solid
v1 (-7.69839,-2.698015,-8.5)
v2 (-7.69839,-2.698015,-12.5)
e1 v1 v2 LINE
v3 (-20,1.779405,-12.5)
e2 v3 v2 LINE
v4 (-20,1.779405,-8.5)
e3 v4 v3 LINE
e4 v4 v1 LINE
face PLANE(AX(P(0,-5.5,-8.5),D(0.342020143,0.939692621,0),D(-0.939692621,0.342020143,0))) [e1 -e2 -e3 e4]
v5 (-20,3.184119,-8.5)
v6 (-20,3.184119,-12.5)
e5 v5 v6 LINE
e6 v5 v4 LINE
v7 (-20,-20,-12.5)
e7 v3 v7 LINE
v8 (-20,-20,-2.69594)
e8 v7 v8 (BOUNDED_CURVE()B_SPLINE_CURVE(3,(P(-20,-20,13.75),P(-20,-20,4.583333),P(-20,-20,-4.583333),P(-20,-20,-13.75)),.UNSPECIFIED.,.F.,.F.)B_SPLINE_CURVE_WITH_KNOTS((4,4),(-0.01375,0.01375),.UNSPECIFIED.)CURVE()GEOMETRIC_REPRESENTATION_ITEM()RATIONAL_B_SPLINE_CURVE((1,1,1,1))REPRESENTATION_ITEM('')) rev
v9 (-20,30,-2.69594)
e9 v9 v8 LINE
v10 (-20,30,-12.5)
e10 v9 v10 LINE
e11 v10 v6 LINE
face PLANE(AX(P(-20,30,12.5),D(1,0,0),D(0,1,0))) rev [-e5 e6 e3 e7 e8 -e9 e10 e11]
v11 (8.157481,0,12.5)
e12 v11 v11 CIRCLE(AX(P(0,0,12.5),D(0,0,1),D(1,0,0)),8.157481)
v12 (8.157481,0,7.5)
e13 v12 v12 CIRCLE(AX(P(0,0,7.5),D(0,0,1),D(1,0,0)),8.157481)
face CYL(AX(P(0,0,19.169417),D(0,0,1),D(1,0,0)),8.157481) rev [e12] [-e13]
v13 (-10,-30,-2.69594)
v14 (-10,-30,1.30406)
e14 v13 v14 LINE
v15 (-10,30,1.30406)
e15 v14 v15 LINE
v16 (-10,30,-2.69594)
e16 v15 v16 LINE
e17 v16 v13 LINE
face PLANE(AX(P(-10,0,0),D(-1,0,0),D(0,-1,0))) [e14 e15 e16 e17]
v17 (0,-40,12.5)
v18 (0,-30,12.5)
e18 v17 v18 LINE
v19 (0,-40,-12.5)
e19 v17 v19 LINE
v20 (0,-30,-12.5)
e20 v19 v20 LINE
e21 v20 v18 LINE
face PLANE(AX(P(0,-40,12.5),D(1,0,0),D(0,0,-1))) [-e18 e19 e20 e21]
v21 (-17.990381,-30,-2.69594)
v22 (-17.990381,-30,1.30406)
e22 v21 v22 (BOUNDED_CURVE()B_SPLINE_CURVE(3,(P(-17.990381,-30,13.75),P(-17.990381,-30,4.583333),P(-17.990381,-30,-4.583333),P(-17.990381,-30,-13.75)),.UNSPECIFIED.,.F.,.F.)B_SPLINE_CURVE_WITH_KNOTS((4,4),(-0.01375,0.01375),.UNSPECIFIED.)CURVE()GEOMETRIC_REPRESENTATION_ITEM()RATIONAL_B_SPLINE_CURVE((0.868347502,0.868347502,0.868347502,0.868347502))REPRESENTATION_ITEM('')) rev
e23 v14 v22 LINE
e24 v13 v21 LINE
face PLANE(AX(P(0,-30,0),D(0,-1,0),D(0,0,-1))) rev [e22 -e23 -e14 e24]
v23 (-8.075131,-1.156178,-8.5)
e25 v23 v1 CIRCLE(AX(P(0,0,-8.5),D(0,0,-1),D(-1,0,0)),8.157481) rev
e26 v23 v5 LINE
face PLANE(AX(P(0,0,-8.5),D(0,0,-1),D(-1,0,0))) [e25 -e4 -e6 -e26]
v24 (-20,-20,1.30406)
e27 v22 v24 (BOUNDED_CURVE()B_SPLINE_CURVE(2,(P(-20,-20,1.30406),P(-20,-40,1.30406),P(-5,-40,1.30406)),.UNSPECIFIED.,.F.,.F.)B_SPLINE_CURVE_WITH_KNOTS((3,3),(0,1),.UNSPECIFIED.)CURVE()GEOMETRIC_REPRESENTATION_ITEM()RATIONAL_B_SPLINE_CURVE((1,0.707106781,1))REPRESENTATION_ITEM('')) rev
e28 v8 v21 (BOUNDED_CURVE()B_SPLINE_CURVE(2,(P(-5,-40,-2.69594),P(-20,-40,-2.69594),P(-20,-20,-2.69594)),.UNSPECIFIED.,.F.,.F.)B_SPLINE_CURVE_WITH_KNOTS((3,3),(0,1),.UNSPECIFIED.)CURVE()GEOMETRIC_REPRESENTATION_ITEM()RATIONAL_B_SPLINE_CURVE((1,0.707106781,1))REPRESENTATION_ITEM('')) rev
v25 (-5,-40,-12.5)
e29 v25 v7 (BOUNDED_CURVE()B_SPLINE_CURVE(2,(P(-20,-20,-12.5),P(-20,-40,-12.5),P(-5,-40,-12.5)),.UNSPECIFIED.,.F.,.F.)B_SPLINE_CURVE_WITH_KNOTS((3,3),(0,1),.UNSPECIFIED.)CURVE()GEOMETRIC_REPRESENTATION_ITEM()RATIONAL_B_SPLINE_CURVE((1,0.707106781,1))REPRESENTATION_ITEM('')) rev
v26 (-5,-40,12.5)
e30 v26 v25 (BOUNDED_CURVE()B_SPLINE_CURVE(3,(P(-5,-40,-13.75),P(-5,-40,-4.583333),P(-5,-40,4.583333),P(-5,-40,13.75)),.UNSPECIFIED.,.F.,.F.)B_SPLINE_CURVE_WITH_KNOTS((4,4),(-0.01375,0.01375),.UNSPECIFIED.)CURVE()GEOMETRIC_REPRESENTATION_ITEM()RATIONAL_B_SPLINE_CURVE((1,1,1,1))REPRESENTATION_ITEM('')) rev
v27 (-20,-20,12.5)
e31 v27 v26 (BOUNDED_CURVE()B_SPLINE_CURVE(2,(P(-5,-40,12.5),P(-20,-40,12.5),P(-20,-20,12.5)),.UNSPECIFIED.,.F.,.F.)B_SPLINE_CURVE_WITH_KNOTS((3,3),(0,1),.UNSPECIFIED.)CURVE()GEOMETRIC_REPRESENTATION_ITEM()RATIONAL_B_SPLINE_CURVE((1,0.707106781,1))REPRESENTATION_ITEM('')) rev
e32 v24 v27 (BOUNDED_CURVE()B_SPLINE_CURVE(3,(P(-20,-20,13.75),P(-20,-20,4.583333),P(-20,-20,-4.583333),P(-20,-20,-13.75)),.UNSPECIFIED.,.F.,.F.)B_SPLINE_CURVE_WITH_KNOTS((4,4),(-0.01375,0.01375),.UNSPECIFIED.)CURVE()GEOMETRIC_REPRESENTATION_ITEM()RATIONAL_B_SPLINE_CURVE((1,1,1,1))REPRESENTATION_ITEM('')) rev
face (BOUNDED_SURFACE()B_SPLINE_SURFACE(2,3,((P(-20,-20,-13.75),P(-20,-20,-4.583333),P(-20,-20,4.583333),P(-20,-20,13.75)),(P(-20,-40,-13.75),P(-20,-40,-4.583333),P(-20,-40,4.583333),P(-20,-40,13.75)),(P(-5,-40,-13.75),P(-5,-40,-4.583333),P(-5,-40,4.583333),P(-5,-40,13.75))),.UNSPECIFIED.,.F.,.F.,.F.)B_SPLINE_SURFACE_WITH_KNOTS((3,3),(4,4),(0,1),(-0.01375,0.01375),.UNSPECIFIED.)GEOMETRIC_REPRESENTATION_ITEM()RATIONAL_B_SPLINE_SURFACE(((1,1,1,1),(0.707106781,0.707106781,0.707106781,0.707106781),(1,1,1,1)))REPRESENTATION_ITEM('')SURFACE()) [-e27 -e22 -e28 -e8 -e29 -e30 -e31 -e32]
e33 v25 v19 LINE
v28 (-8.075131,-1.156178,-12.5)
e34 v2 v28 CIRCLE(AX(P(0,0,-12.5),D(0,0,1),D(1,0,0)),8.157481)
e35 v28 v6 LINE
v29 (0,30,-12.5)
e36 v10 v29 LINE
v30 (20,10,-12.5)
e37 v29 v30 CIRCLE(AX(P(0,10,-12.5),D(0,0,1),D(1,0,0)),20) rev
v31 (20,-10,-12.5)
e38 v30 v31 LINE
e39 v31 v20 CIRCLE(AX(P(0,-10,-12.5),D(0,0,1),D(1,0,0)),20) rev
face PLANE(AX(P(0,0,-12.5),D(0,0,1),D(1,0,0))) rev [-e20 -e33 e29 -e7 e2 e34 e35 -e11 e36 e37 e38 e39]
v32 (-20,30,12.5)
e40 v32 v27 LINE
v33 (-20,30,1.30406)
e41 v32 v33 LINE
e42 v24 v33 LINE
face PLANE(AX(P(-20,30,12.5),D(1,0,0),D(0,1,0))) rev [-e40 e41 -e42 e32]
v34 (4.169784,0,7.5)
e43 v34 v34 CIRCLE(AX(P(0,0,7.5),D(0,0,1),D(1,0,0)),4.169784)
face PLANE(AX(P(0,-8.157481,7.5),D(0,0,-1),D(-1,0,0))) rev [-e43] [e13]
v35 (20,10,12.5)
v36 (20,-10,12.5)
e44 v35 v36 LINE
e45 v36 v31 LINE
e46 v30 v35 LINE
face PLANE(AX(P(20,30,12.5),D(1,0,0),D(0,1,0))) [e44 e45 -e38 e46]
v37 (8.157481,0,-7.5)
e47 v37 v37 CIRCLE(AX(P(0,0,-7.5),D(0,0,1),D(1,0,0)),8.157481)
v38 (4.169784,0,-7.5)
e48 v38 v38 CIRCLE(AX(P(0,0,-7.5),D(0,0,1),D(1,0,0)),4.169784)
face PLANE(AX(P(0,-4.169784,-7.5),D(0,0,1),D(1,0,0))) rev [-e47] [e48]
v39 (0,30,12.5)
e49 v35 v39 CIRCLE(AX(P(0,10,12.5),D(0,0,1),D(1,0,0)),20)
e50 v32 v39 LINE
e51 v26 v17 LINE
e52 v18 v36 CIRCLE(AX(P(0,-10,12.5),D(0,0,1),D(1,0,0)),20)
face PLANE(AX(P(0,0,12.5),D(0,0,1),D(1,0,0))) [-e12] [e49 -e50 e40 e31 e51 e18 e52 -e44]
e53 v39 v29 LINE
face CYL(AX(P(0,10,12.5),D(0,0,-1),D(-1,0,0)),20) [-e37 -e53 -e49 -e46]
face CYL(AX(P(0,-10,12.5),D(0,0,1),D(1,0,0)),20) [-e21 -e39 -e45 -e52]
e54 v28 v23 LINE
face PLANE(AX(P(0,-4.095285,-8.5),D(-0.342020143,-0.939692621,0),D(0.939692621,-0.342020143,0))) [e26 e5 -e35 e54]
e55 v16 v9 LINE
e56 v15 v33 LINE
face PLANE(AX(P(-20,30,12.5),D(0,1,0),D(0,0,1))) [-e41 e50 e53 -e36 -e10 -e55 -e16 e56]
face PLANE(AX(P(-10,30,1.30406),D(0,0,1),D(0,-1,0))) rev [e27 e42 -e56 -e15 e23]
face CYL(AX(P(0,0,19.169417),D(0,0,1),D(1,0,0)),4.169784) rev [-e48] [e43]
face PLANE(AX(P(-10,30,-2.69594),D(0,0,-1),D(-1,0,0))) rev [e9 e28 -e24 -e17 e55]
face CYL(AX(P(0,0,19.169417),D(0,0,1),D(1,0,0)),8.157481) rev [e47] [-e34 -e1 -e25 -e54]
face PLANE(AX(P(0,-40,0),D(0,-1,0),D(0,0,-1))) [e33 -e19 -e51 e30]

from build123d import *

# Parameters (mm, degrees)
SKETCH1_W           = 40
SKETCH1_H           = 60
BOSS_EXTRUDE1_DEPTH = 12.5
SKETCH4_W           = 4
SKETCH4_H           = 60
CUT_EXTRUDE1_DEPTH  = 10
CUT_EXTRUDE2_DEPTH  = 4
FILLET1_R           = 20
SKETCH6_W           = 20
SKETCH6_H           = 25
BOSS_EXTRUDE2_DEPTH = 10
FILLET2_SIZE        = 15
FILLET2_SIZE_2      = 20


with BuildPart() as part:
    # Sketch1 → Boss-Extrude1 (new, symmetric)
    with BuildSketch(Plane.XY):
        Rectangle(SKETCH1_W, SKETCH1_H)
    extrude(amount=BOSS_EXTRUDE1_DEPTH, both=True)

    # Sketch3 → Cut-Revolve1 (revolve, cut)
    with BuildSketch(Plane(origin=(0, 0, 0), x_dir=(0, 0, -1), z_dir=(1, 0, 0)), mode=Mode.PRIVATE) as cut_revolve1_sk:
        Polygon((-12.5, -8.157480559), (-7.5, -8.157480559), (-7.5, -4.169784019), (7.5, -4.169784019), (7.5, -8.157480559), (12.5, -8.157480559), (12.5, 0), (-12.5, 0), align=None)
    revolve(cut_revolve1_sk.sketch.rotate(Axis((0, 0, 19.169416837), (0, 0, -1)), 270), axis=Axis((0, 0, 19.169416837), (0, 0, -1)), mode=Mode.SUBTRACT)

    # Sketch4 → Cut-Extrude1 (cut)
    with BuildSketch(Plane.ZY.offset(20)):
        with Locations((-0.695939916, 0)):
            Rectangle(SKETCH4_W, SKETCH4_H)
    extrude(amount=-CUT_EXTRUDE1_DEPTH, mode=Mode.SUBTRACT)

    # Sketch5 → Cut-Extrude2 (cut)
    with BuildSketch(Plane.XY.offset(-12.5)):
        Polygon((0, -5.5), (-20, 1.779404685), (-20, 3.184119345), (0, -4.09528534), align=None)
    extrude(amount=CUT_EXTRUDE2_DEPTH, mode=Mode.SUBTRACT)

    # Fillet1
    fillet1_edges = [part.edges().sort_by_distance(p)[0] for p in [
        (20, 30, 0),
        (20, -30, 0),
    ]]
    fillet(fillet1_edges, radius=FILLET1_R)

    # Sketch6 → Boss-Extrude2 (add)
    with BuildSketch(Plane(origin=(0, -30, 0), x_dir=(1, 0, 0), z_dir=(0, 1, 0))):
        with Locations((-10, 0)):
            Rectangle(SKETCH6_W, SKETCH6_H)
    extrude(amount=-BOSS_EXTRUDE2_DEPTH)

    # Fillet2
    # an asymmetric fillet: 20, 15 mm, written as the material it takes off along each edge
    with BuildSketch(Plane(origin=(-20, -40, -62.5), x_dir=(1, 0, 0), z_dir=(0, 0, 1))) as fillet2_piece_1:
        with BuildLine():
            Bezier((FILLET2_SIZE, 0), (0, 0), (0, FILLET2_SIZE_2), weights=[1, 0.707106781, 1])
            Line((0, FILLET2_SIZE_2), (0, 0))
            Line((0, 0), (FILLET2_SIZE, 0))
        make_face()
    extrude(amount=125, mode=Mode.SUBTRACT)


solid = part.part
